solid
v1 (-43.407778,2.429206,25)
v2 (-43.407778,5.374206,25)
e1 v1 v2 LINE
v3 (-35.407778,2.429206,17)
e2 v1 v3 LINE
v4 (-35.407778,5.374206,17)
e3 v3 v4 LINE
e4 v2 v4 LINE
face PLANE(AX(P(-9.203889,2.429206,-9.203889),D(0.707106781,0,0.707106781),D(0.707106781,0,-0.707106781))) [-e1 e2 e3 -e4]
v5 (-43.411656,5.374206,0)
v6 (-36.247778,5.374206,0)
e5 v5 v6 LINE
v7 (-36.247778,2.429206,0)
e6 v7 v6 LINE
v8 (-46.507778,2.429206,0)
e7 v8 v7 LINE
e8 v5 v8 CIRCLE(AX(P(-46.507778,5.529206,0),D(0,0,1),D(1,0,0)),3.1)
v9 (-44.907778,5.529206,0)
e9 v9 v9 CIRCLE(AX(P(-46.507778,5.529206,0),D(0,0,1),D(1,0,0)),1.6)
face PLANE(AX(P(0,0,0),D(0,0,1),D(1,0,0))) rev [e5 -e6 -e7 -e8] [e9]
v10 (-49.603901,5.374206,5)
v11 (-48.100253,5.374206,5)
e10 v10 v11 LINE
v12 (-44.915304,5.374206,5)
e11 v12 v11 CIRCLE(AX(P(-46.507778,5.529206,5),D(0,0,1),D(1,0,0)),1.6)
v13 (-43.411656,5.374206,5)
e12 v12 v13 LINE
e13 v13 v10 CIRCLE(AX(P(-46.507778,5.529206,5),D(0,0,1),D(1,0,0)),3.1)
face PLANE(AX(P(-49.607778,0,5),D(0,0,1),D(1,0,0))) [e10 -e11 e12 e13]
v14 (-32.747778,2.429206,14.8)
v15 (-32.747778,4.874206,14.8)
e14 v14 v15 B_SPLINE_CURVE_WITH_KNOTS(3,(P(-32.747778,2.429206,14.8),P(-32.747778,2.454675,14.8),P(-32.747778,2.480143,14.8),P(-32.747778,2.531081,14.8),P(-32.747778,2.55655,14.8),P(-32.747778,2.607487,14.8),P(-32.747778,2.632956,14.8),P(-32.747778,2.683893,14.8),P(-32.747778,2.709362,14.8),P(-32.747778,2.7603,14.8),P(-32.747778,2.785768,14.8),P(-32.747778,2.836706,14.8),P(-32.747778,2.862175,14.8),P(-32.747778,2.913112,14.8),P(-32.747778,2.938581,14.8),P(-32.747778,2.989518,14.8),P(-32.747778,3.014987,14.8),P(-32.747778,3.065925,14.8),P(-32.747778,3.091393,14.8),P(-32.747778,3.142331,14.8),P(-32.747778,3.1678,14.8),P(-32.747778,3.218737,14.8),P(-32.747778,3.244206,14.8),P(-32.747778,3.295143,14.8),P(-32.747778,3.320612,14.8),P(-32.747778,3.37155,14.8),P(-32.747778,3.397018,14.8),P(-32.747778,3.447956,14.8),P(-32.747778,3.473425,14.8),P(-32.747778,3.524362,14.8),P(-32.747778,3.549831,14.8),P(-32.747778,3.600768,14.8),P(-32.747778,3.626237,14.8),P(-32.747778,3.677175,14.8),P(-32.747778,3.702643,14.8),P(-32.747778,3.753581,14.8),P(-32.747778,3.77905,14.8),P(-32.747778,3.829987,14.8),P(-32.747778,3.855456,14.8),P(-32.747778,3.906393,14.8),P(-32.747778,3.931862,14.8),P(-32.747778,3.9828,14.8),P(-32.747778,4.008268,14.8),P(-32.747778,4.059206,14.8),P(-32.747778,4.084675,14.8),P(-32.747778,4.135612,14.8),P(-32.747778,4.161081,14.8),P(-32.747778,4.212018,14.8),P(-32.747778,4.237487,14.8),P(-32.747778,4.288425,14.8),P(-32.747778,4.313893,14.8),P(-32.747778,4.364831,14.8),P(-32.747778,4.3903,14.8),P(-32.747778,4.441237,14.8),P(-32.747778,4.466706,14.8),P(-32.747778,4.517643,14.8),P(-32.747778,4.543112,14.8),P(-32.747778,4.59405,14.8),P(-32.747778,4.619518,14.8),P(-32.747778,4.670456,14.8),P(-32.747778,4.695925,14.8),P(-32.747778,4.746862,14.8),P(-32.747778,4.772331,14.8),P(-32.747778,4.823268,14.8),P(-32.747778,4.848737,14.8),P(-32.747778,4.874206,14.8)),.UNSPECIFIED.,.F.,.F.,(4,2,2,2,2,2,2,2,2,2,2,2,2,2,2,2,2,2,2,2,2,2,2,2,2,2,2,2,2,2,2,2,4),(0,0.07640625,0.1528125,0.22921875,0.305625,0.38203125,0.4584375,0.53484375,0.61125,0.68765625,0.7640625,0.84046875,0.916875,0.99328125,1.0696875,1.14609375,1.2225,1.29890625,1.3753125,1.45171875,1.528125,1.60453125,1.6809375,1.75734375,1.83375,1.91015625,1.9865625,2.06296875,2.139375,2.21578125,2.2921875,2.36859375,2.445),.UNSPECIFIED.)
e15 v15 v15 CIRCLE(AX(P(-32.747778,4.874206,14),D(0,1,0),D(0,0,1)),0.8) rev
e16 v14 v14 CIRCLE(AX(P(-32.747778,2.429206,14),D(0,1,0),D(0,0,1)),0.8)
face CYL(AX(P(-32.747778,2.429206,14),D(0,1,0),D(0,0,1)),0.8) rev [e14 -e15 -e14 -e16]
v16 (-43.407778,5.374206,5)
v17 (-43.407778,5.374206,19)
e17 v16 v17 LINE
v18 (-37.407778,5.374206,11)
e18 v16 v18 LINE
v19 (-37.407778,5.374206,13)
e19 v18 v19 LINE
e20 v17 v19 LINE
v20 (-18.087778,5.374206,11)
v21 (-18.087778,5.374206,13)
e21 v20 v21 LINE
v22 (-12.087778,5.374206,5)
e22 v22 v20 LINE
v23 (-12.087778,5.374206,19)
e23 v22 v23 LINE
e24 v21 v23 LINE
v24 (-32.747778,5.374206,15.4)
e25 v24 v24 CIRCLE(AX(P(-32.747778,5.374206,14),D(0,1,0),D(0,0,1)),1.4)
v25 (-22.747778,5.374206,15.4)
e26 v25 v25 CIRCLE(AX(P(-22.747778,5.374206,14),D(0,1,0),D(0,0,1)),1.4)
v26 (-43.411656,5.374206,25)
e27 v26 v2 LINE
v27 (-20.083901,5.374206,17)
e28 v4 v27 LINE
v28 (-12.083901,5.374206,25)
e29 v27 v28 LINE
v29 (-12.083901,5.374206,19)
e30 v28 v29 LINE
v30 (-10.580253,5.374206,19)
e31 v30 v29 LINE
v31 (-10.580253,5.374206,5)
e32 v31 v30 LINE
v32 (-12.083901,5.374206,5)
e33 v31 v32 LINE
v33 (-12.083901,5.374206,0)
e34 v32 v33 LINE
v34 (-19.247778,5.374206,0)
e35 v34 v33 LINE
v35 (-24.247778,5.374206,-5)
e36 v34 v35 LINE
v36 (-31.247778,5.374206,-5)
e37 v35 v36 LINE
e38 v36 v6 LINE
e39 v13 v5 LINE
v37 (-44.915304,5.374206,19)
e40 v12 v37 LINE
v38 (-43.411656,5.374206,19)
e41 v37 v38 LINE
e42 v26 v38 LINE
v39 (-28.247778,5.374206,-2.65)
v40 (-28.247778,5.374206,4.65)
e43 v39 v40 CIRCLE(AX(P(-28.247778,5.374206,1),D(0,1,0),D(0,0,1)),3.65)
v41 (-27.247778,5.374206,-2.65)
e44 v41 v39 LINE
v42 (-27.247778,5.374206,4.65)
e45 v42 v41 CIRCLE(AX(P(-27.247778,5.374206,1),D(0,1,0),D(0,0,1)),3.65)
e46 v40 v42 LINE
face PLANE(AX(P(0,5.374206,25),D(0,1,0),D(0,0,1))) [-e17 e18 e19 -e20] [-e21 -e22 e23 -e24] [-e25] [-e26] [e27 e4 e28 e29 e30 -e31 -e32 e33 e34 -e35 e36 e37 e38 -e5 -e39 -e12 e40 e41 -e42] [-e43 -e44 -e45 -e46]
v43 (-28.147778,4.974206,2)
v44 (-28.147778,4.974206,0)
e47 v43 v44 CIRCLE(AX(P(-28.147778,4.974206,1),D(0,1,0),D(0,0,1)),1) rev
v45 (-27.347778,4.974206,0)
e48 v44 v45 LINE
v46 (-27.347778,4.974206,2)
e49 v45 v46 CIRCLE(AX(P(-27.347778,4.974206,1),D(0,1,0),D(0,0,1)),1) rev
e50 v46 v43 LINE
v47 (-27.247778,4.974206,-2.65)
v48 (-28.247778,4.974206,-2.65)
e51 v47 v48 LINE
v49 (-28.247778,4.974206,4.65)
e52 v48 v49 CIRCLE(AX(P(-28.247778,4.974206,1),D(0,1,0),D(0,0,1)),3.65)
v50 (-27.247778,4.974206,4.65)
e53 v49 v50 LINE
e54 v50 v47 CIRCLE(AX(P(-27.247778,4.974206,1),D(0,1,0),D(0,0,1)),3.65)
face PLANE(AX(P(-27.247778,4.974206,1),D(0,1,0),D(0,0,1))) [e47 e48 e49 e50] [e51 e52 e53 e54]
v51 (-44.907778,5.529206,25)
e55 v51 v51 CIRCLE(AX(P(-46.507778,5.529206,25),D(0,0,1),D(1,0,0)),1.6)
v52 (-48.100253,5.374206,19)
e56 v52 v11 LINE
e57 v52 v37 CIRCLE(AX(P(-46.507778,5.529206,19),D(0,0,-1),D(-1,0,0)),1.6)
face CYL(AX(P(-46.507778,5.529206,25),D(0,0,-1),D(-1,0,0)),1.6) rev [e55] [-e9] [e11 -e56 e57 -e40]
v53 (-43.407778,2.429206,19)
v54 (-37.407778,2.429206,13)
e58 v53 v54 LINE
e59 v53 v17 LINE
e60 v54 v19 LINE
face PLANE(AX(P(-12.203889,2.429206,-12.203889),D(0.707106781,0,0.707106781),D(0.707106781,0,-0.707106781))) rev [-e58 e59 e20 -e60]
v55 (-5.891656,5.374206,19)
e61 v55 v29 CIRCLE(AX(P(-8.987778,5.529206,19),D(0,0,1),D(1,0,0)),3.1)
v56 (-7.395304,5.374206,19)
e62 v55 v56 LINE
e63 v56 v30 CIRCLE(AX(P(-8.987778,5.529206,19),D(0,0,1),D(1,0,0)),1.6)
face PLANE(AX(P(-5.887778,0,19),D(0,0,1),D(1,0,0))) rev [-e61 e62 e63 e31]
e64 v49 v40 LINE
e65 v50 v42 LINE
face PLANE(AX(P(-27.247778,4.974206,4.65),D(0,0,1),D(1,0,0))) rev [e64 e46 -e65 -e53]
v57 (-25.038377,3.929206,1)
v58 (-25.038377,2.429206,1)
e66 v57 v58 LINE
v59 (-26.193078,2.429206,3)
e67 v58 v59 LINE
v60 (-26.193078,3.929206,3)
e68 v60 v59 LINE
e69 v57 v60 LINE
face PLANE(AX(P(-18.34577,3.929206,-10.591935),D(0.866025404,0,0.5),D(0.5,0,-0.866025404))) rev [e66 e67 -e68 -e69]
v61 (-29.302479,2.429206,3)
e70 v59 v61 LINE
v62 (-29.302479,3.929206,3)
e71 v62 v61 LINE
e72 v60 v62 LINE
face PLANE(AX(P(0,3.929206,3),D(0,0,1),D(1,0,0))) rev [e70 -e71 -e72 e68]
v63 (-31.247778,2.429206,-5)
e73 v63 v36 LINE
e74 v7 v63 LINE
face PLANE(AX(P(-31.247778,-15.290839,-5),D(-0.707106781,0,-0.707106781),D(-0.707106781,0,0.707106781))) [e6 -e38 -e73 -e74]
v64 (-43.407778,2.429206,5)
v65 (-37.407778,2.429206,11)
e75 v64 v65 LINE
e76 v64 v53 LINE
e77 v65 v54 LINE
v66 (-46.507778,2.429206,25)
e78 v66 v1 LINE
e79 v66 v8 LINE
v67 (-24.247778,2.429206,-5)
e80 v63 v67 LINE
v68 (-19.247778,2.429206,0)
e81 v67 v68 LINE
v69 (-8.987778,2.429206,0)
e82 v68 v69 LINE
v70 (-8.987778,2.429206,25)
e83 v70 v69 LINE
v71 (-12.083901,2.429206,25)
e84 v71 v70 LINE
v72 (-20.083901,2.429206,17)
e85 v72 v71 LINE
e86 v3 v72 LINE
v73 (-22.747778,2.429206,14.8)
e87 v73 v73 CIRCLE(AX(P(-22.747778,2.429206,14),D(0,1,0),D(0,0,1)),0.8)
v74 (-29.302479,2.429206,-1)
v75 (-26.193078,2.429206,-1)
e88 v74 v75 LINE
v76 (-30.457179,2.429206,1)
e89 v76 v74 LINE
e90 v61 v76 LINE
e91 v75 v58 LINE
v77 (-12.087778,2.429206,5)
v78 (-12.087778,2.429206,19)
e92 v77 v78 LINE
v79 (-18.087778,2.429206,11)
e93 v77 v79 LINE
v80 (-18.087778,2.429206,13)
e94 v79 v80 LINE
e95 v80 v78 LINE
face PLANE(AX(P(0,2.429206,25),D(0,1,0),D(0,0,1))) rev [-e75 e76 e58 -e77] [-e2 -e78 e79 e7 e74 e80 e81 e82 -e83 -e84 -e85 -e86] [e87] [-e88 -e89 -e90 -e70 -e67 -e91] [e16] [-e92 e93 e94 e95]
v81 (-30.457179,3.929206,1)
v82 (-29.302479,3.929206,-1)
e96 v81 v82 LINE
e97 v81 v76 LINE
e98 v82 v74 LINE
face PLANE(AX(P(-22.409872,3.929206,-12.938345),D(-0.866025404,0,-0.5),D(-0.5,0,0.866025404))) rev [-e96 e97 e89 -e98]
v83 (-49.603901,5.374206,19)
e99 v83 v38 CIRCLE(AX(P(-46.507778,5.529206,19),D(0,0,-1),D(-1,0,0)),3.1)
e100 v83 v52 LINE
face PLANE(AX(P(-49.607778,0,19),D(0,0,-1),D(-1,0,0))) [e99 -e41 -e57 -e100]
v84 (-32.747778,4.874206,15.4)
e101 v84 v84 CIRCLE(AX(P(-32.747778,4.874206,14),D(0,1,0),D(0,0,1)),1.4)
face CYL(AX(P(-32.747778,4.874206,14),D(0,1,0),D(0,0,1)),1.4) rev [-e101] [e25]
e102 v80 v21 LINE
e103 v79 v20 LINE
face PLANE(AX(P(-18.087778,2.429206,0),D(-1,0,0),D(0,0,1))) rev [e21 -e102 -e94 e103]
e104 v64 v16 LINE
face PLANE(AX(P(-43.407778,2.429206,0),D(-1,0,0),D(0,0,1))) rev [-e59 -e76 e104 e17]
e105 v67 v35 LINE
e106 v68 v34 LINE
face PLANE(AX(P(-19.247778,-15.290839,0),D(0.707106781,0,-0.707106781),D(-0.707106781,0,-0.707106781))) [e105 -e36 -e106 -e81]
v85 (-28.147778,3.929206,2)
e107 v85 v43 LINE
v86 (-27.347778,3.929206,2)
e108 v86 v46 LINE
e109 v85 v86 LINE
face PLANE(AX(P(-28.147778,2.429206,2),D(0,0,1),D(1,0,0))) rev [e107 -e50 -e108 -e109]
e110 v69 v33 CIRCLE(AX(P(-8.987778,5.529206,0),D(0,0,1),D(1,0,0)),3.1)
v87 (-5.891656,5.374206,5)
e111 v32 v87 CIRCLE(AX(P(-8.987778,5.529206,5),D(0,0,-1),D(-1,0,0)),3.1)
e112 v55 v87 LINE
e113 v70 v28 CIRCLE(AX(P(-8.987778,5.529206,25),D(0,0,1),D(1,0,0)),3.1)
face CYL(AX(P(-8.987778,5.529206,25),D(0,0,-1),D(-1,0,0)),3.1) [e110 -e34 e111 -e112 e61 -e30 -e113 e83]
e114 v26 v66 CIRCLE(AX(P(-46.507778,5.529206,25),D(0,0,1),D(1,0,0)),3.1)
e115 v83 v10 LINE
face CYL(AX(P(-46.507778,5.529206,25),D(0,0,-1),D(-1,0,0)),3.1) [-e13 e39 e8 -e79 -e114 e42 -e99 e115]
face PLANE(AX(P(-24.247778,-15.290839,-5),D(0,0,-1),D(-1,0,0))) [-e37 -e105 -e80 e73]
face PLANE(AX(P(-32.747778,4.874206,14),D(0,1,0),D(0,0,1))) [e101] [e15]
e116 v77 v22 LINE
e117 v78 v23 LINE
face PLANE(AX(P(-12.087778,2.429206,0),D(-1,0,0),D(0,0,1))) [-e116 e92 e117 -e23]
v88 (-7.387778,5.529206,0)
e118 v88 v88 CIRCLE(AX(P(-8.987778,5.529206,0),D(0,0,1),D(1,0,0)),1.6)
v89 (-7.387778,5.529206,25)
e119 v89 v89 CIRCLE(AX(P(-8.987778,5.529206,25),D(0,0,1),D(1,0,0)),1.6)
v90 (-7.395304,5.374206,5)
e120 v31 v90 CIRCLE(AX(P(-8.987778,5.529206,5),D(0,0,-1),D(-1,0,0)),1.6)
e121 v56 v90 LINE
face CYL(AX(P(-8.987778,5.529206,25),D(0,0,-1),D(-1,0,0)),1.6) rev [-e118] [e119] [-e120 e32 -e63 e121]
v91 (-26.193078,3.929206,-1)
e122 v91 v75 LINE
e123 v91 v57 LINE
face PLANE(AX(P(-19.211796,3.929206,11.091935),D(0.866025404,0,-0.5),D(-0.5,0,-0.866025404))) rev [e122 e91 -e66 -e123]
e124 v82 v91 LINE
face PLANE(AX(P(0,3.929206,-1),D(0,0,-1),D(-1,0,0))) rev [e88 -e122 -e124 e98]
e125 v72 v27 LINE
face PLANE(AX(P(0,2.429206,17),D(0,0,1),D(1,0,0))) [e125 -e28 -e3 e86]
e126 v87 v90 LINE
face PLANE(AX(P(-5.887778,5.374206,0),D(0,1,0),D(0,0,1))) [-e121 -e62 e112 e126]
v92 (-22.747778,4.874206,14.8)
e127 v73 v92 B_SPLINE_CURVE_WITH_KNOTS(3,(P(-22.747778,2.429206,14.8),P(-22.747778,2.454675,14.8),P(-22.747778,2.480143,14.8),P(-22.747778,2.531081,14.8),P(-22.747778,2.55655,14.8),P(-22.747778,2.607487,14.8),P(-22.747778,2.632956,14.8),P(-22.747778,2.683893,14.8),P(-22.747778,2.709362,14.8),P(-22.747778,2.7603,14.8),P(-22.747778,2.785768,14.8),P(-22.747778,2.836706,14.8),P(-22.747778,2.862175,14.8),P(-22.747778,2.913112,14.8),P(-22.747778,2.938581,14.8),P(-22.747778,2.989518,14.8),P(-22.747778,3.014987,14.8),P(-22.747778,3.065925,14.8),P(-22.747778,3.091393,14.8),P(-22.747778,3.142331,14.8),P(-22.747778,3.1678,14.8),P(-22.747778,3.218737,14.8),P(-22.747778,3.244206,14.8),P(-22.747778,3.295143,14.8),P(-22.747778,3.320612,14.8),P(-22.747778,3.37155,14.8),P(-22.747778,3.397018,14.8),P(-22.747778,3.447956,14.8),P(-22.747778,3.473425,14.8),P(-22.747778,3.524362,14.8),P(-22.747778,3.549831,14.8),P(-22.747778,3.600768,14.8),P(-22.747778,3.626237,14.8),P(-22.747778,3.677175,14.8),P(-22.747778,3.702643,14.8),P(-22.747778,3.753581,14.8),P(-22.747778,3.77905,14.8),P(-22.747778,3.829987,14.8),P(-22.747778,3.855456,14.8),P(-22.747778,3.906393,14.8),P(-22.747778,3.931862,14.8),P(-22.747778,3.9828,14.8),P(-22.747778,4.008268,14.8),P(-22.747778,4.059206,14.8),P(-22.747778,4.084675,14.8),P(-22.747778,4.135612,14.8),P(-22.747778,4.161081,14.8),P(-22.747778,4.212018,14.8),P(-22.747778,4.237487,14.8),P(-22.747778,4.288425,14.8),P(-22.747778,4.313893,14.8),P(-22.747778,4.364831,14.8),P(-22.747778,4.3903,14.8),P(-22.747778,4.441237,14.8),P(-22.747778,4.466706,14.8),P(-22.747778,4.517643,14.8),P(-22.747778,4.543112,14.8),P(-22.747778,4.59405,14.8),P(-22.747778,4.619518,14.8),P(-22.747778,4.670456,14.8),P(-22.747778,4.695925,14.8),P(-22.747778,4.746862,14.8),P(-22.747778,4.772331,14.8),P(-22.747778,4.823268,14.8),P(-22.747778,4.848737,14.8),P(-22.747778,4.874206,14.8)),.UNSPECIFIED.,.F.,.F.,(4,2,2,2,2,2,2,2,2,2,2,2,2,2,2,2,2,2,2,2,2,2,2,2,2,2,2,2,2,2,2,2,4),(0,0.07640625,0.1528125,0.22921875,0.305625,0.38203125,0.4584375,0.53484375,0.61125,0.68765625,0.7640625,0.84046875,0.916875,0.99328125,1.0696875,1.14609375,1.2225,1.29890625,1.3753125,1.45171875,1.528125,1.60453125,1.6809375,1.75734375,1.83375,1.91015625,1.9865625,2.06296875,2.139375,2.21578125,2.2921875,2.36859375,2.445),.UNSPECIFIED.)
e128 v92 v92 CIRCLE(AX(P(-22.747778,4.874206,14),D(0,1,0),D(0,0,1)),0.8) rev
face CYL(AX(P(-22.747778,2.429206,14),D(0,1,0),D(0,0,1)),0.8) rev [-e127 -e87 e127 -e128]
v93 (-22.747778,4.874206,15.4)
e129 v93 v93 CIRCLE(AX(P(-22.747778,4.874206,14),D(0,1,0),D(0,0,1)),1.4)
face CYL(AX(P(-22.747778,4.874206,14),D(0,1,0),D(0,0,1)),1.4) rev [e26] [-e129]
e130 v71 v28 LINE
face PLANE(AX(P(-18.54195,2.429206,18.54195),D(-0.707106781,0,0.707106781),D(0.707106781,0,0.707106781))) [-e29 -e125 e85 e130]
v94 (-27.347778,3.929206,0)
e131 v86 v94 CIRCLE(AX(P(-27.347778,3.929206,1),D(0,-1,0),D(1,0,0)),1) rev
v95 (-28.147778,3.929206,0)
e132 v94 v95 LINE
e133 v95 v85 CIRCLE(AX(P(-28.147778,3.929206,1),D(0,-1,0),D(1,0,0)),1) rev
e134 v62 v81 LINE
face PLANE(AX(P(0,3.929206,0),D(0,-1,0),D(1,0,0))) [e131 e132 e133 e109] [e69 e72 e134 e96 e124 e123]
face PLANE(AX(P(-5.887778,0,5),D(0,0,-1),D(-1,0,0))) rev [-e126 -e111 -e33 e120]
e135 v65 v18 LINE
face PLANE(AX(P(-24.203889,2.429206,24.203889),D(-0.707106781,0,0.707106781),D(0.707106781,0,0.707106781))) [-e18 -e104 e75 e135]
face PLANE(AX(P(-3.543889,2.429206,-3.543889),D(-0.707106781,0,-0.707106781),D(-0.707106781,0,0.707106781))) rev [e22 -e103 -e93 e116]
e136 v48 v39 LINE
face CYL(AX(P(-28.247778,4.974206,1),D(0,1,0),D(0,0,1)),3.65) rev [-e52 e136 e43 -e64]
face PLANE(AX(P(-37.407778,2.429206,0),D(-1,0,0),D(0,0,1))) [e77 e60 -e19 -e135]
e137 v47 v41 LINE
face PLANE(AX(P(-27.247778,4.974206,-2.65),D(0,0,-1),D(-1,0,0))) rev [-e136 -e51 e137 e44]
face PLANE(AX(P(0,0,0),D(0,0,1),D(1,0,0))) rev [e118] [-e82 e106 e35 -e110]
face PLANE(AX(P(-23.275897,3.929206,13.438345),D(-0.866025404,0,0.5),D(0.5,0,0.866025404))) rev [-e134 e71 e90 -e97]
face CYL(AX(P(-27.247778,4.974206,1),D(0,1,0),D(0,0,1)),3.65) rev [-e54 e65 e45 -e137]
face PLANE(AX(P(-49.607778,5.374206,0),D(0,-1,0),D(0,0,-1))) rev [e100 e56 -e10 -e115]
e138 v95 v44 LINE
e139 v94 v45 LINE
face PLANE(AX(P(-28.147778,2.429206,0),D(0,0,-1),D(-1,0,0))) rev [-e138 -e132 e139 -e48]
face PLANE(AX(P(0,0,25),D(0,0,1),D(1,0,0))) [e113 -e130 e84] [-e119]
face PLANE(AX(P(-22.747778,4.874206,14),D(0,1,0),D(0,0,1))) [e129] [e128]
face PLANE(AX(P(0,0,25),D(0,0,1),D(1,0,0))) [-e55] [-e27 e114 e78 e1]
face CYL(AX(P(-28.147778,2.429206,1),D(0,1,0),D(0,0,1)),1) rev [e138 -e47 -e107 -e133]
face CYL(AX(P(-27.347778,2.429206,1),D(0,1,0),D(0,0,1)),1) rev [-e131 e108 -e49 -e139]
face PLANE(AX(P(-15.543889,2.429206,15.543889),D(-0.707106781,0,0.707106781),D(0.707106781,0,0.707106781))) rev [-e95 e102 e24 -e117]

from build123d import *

# Parameters (mm, degrees)
SKETCH_1_R             = 3.1
SKETCH_1_R_2           = 1.6
EXTRUDE_1_DEPTH        = 25
EXTRUDE_2_DEPTH        = 2.945
CUT_EXTRUDE_1_DEPTH    = 56.64644355
CUT_EXTRUDE_START      = -1.5
CUT_EXTRUDE_2844_DEPTH = 1.5
SKETCH_6_R             = 0.8
CUT_EXTRUDE_5_DEPTH    = 56.64644355
CUT_EXTRUDE_6_DEPTH    = 56.64644355
SKETCH_9_W             = 14
SKETCH_9_H             = 3.255
CUT_EXTRUDE_9_DEPTH    = 46.904396246
SKETCH_10_R            = 1.4
CUT_EXTRUDE_11_DEPTH   = 0.5
CUT_EXTRUDE_12_DEPTH   = 0.4


# Read off the part's stored shape, not the designer's step: 切除-螺母孔
with BuildPart() as part:
    # 草图1 → 凸台-拉伸1 (new body)
    # profile 1 of 3: a face of its own
    with BuildSketch(Plane.XY):
        with Locations((-46.507778168, 5.529205914)):
            Circle(SKETCH_1_R)
        with Locations((-46.507778168, 5.529205914)):
            Circle(SKETCH_1_R_2, mode=Mode.SUBTRACT)
    # profile 2 of 3: a face of its own
    with BuildSketch(Plane.XY):
        with BuildLine():
            ThreePointArc((-43.411655593, 5.374205914), (-44.371250611, 3.283042519), (-46.507778168, 2.429205914))
            Line((-46.507778168, 2.429205914), (-8.987778168, 2.429205914))
            ThreePointArc((-8.987778168, 2.429205914), (-11.124305724, 3.283042519), (-12.083900743, 5.374205914))
            Line((-12.083900743, 5.374205914), (-43.411655593, 5.374205914))
        make_face()
    # profile 3 of 3: a face of its own
    with BuildSketch(Plane.XY):
        with Locations((-8.987778168, 5.529205914)):
            Circle(SKETCH_1_R)
        with Locations((-8.987778168, 5.529205914)):
            Circle(SKETCH_1_R_2, mode=Mode.SUBTRACT)
    extrude(amount=EXTRUDE_1_DEPTH)

    # 草图2 → 凸台-拉伸2 (add)
    with BuildSketch(Plane(origin=(0, 5.374205914, 0), x_dir=(1, 0, 0), z_dir=(0, 1, 0))):
        Polygon((-19.247778168, 0), (-24.247778168, 5), (-31.247778168, 5), (-36.247778168, 0), align=None)
    extrude(amount=-EXTRUDE_2_DEPTH)

    # 草图3 → 切除-拉伸1 (cut, through all)
    with BuildSketch(Plane(origin=(0, 5.374205914, 0), x_dir=(1, 0, 0), z_dir=(0, 1, 0))):
        with BuildLine():
            Line((-28.147778168, 0), (-27.347778168, 0))
            ThreePointArc((-27.347778168, 0), (-26.347778168, -1), (-27.347778168, -2))
            Line((-27.347778168, -2), (-28.147778168, -2))
            ThreePointArc((-28.147778168, -2), (-29.147778168, -1), (-28.147778168, 0))
        make_face()
    extrude(amount=-CUT_EXTRUDE_1_DEPTH, mode=Mode.SUBTRACT)

    # Cut-Extrude 2844 outline → Cut-Extrude 2844 (cut)
    with BuildSketch(Plane(origin=(0, 2.429205914, 0), x_dir=(-1, 0, 0), z_dir=(0, -1, 0)).offset(CUT_EXTRUDE_START)):
        Polygon((25.038377091, -1), (26.193077629, -3), (29.302478706, -3), (30.457179245, -1), (29.302478706, 1), (26.193077629, 1), align=None)
        with BuildLine():
            Line((27.347778168, 0), (28.147778168, 0))
            ThreePointArc((28.147778168, 0), (29.147778168, -1), (28.147778168, -2))
            Line((28.147778168, -2), (27.347778168, -2))
            ThreePointArc((27.347778168, -2), (26.347778168, -1), (27.347778168, 0))
        make_face(mode=Mode.SUBTRACT)
    extrude(amount=CUT_EXTRUDE_2844_DEPTH, mode=Mode.SUBTRACT)

    # 草图6 → 切除-拉伸5 (cut, through all)
    with BuildSketch(Plane(origin=(0, 5.374205914, 0), x_dir=(1, 0, 0), z_dir=(0, 1, 0))):
        with Locations(Location((-32.747778168, -14, 0), (0, 0, 270))):
            Circle(SKETCH_6_R)
        with Locations(Location((-22.747778168, -14, 0), (0, 0, 270))):
            Circle(SKETCH_6_R)
    extrude(amount=-CUT_EXTRUDE_5_DEPTH, mode=Mode.SUBTRACT)

    # 草图7 → 切除-拉伸6 (cut, through all)
    with BuildSketch(Plane(origin=(0, 5.374205914, 0), x_dir=(1, 0, 0), z_dir=(0, 1, 0))):
        Polygon((-35.407778168, -17), (-43.407778168, -25), (-12.083900743, -25), (-20.083900743, -17), align=None)
        Polygon((-37.407778168, -13), (-37.407778168, -11), (-43.407778168, -5), (-43.407778168, -19), align=None)
        Polygon((-12.087778168, -5), (-18.087778168, -11), (-18.087778168, -13), (-12.087778168, -19), align=None)
    extrude(amount=-CUT_EXTRUDE_6_DEPTH, mode=Mode.SUBTRACT)

    # 草图9 → 切除-拉伸9 (cut, through all)
    with BuildSketch(Plane.ZY.offset(12.087778168)):
        with Locations((12, 7.001705914)):
            Rectangle(SKETCH_9_W, SKETCH_9_H)
    cut_extrude_9 = extrude(amount=-CUT_EXTRUDE_9_DEPTH, mode=Mode.SUBTRACT)

    # 镜向1: 切除-拉伸9 across plane
    add(cut_extrude_9.mirror(Plane(origin=(-27.747778168, 0, 0), x_dir=(0, 0, 1), z_dir=(1, 0, 0))), mode=Mode.SUBTRACT)

    # 草图10 → 切除-拉伸11 (cut)
    with BuildSketch(Plane(origin=(0, 5.374205914, 0), x_dir=(1, 0, 0), z_dir=(0, 1, 0))):
        with Locations(Location((-22.747778168, -14, 0), (0, 0, 270))):
            Circle(SKETCH_10_R)
        with Locations(Location((-32.747778168, -14, 0), (0, 0, 270))):
            Circle(SKETCH_10_R)
    extrude(amount=-CUT_EXTRUDE_11_DEPTH, mode=Mode.SUBTRACT)

    # 草图11 → 切除-拉伸12 (cut)
    with BuildSketch(Plane(origin=(0, 5.374205914, 0), x_dir=(1, 0, 0), z_dir=(0, 1, 0))):
        with BuildLine():
            Line((-27.247778168, -4.65), (-28.247778168, -4.65))
            ThreePointArc((-28.247778168, -4.65), (-31.897778168, -1), (-28.247778168, 2.65))
            Line((-28.247778168, 2.65), (-27.247778168, 2.65))
            ThreePointArc((-27.247778168, 2.65), (-23.597778168, -1), (-27.247778168, -4.65))
        make_face()
    extrude(amount=-CUT_EXTRUDE_12_DEPTH, mode=Mode.SUBTRACT)


solid = part.part
